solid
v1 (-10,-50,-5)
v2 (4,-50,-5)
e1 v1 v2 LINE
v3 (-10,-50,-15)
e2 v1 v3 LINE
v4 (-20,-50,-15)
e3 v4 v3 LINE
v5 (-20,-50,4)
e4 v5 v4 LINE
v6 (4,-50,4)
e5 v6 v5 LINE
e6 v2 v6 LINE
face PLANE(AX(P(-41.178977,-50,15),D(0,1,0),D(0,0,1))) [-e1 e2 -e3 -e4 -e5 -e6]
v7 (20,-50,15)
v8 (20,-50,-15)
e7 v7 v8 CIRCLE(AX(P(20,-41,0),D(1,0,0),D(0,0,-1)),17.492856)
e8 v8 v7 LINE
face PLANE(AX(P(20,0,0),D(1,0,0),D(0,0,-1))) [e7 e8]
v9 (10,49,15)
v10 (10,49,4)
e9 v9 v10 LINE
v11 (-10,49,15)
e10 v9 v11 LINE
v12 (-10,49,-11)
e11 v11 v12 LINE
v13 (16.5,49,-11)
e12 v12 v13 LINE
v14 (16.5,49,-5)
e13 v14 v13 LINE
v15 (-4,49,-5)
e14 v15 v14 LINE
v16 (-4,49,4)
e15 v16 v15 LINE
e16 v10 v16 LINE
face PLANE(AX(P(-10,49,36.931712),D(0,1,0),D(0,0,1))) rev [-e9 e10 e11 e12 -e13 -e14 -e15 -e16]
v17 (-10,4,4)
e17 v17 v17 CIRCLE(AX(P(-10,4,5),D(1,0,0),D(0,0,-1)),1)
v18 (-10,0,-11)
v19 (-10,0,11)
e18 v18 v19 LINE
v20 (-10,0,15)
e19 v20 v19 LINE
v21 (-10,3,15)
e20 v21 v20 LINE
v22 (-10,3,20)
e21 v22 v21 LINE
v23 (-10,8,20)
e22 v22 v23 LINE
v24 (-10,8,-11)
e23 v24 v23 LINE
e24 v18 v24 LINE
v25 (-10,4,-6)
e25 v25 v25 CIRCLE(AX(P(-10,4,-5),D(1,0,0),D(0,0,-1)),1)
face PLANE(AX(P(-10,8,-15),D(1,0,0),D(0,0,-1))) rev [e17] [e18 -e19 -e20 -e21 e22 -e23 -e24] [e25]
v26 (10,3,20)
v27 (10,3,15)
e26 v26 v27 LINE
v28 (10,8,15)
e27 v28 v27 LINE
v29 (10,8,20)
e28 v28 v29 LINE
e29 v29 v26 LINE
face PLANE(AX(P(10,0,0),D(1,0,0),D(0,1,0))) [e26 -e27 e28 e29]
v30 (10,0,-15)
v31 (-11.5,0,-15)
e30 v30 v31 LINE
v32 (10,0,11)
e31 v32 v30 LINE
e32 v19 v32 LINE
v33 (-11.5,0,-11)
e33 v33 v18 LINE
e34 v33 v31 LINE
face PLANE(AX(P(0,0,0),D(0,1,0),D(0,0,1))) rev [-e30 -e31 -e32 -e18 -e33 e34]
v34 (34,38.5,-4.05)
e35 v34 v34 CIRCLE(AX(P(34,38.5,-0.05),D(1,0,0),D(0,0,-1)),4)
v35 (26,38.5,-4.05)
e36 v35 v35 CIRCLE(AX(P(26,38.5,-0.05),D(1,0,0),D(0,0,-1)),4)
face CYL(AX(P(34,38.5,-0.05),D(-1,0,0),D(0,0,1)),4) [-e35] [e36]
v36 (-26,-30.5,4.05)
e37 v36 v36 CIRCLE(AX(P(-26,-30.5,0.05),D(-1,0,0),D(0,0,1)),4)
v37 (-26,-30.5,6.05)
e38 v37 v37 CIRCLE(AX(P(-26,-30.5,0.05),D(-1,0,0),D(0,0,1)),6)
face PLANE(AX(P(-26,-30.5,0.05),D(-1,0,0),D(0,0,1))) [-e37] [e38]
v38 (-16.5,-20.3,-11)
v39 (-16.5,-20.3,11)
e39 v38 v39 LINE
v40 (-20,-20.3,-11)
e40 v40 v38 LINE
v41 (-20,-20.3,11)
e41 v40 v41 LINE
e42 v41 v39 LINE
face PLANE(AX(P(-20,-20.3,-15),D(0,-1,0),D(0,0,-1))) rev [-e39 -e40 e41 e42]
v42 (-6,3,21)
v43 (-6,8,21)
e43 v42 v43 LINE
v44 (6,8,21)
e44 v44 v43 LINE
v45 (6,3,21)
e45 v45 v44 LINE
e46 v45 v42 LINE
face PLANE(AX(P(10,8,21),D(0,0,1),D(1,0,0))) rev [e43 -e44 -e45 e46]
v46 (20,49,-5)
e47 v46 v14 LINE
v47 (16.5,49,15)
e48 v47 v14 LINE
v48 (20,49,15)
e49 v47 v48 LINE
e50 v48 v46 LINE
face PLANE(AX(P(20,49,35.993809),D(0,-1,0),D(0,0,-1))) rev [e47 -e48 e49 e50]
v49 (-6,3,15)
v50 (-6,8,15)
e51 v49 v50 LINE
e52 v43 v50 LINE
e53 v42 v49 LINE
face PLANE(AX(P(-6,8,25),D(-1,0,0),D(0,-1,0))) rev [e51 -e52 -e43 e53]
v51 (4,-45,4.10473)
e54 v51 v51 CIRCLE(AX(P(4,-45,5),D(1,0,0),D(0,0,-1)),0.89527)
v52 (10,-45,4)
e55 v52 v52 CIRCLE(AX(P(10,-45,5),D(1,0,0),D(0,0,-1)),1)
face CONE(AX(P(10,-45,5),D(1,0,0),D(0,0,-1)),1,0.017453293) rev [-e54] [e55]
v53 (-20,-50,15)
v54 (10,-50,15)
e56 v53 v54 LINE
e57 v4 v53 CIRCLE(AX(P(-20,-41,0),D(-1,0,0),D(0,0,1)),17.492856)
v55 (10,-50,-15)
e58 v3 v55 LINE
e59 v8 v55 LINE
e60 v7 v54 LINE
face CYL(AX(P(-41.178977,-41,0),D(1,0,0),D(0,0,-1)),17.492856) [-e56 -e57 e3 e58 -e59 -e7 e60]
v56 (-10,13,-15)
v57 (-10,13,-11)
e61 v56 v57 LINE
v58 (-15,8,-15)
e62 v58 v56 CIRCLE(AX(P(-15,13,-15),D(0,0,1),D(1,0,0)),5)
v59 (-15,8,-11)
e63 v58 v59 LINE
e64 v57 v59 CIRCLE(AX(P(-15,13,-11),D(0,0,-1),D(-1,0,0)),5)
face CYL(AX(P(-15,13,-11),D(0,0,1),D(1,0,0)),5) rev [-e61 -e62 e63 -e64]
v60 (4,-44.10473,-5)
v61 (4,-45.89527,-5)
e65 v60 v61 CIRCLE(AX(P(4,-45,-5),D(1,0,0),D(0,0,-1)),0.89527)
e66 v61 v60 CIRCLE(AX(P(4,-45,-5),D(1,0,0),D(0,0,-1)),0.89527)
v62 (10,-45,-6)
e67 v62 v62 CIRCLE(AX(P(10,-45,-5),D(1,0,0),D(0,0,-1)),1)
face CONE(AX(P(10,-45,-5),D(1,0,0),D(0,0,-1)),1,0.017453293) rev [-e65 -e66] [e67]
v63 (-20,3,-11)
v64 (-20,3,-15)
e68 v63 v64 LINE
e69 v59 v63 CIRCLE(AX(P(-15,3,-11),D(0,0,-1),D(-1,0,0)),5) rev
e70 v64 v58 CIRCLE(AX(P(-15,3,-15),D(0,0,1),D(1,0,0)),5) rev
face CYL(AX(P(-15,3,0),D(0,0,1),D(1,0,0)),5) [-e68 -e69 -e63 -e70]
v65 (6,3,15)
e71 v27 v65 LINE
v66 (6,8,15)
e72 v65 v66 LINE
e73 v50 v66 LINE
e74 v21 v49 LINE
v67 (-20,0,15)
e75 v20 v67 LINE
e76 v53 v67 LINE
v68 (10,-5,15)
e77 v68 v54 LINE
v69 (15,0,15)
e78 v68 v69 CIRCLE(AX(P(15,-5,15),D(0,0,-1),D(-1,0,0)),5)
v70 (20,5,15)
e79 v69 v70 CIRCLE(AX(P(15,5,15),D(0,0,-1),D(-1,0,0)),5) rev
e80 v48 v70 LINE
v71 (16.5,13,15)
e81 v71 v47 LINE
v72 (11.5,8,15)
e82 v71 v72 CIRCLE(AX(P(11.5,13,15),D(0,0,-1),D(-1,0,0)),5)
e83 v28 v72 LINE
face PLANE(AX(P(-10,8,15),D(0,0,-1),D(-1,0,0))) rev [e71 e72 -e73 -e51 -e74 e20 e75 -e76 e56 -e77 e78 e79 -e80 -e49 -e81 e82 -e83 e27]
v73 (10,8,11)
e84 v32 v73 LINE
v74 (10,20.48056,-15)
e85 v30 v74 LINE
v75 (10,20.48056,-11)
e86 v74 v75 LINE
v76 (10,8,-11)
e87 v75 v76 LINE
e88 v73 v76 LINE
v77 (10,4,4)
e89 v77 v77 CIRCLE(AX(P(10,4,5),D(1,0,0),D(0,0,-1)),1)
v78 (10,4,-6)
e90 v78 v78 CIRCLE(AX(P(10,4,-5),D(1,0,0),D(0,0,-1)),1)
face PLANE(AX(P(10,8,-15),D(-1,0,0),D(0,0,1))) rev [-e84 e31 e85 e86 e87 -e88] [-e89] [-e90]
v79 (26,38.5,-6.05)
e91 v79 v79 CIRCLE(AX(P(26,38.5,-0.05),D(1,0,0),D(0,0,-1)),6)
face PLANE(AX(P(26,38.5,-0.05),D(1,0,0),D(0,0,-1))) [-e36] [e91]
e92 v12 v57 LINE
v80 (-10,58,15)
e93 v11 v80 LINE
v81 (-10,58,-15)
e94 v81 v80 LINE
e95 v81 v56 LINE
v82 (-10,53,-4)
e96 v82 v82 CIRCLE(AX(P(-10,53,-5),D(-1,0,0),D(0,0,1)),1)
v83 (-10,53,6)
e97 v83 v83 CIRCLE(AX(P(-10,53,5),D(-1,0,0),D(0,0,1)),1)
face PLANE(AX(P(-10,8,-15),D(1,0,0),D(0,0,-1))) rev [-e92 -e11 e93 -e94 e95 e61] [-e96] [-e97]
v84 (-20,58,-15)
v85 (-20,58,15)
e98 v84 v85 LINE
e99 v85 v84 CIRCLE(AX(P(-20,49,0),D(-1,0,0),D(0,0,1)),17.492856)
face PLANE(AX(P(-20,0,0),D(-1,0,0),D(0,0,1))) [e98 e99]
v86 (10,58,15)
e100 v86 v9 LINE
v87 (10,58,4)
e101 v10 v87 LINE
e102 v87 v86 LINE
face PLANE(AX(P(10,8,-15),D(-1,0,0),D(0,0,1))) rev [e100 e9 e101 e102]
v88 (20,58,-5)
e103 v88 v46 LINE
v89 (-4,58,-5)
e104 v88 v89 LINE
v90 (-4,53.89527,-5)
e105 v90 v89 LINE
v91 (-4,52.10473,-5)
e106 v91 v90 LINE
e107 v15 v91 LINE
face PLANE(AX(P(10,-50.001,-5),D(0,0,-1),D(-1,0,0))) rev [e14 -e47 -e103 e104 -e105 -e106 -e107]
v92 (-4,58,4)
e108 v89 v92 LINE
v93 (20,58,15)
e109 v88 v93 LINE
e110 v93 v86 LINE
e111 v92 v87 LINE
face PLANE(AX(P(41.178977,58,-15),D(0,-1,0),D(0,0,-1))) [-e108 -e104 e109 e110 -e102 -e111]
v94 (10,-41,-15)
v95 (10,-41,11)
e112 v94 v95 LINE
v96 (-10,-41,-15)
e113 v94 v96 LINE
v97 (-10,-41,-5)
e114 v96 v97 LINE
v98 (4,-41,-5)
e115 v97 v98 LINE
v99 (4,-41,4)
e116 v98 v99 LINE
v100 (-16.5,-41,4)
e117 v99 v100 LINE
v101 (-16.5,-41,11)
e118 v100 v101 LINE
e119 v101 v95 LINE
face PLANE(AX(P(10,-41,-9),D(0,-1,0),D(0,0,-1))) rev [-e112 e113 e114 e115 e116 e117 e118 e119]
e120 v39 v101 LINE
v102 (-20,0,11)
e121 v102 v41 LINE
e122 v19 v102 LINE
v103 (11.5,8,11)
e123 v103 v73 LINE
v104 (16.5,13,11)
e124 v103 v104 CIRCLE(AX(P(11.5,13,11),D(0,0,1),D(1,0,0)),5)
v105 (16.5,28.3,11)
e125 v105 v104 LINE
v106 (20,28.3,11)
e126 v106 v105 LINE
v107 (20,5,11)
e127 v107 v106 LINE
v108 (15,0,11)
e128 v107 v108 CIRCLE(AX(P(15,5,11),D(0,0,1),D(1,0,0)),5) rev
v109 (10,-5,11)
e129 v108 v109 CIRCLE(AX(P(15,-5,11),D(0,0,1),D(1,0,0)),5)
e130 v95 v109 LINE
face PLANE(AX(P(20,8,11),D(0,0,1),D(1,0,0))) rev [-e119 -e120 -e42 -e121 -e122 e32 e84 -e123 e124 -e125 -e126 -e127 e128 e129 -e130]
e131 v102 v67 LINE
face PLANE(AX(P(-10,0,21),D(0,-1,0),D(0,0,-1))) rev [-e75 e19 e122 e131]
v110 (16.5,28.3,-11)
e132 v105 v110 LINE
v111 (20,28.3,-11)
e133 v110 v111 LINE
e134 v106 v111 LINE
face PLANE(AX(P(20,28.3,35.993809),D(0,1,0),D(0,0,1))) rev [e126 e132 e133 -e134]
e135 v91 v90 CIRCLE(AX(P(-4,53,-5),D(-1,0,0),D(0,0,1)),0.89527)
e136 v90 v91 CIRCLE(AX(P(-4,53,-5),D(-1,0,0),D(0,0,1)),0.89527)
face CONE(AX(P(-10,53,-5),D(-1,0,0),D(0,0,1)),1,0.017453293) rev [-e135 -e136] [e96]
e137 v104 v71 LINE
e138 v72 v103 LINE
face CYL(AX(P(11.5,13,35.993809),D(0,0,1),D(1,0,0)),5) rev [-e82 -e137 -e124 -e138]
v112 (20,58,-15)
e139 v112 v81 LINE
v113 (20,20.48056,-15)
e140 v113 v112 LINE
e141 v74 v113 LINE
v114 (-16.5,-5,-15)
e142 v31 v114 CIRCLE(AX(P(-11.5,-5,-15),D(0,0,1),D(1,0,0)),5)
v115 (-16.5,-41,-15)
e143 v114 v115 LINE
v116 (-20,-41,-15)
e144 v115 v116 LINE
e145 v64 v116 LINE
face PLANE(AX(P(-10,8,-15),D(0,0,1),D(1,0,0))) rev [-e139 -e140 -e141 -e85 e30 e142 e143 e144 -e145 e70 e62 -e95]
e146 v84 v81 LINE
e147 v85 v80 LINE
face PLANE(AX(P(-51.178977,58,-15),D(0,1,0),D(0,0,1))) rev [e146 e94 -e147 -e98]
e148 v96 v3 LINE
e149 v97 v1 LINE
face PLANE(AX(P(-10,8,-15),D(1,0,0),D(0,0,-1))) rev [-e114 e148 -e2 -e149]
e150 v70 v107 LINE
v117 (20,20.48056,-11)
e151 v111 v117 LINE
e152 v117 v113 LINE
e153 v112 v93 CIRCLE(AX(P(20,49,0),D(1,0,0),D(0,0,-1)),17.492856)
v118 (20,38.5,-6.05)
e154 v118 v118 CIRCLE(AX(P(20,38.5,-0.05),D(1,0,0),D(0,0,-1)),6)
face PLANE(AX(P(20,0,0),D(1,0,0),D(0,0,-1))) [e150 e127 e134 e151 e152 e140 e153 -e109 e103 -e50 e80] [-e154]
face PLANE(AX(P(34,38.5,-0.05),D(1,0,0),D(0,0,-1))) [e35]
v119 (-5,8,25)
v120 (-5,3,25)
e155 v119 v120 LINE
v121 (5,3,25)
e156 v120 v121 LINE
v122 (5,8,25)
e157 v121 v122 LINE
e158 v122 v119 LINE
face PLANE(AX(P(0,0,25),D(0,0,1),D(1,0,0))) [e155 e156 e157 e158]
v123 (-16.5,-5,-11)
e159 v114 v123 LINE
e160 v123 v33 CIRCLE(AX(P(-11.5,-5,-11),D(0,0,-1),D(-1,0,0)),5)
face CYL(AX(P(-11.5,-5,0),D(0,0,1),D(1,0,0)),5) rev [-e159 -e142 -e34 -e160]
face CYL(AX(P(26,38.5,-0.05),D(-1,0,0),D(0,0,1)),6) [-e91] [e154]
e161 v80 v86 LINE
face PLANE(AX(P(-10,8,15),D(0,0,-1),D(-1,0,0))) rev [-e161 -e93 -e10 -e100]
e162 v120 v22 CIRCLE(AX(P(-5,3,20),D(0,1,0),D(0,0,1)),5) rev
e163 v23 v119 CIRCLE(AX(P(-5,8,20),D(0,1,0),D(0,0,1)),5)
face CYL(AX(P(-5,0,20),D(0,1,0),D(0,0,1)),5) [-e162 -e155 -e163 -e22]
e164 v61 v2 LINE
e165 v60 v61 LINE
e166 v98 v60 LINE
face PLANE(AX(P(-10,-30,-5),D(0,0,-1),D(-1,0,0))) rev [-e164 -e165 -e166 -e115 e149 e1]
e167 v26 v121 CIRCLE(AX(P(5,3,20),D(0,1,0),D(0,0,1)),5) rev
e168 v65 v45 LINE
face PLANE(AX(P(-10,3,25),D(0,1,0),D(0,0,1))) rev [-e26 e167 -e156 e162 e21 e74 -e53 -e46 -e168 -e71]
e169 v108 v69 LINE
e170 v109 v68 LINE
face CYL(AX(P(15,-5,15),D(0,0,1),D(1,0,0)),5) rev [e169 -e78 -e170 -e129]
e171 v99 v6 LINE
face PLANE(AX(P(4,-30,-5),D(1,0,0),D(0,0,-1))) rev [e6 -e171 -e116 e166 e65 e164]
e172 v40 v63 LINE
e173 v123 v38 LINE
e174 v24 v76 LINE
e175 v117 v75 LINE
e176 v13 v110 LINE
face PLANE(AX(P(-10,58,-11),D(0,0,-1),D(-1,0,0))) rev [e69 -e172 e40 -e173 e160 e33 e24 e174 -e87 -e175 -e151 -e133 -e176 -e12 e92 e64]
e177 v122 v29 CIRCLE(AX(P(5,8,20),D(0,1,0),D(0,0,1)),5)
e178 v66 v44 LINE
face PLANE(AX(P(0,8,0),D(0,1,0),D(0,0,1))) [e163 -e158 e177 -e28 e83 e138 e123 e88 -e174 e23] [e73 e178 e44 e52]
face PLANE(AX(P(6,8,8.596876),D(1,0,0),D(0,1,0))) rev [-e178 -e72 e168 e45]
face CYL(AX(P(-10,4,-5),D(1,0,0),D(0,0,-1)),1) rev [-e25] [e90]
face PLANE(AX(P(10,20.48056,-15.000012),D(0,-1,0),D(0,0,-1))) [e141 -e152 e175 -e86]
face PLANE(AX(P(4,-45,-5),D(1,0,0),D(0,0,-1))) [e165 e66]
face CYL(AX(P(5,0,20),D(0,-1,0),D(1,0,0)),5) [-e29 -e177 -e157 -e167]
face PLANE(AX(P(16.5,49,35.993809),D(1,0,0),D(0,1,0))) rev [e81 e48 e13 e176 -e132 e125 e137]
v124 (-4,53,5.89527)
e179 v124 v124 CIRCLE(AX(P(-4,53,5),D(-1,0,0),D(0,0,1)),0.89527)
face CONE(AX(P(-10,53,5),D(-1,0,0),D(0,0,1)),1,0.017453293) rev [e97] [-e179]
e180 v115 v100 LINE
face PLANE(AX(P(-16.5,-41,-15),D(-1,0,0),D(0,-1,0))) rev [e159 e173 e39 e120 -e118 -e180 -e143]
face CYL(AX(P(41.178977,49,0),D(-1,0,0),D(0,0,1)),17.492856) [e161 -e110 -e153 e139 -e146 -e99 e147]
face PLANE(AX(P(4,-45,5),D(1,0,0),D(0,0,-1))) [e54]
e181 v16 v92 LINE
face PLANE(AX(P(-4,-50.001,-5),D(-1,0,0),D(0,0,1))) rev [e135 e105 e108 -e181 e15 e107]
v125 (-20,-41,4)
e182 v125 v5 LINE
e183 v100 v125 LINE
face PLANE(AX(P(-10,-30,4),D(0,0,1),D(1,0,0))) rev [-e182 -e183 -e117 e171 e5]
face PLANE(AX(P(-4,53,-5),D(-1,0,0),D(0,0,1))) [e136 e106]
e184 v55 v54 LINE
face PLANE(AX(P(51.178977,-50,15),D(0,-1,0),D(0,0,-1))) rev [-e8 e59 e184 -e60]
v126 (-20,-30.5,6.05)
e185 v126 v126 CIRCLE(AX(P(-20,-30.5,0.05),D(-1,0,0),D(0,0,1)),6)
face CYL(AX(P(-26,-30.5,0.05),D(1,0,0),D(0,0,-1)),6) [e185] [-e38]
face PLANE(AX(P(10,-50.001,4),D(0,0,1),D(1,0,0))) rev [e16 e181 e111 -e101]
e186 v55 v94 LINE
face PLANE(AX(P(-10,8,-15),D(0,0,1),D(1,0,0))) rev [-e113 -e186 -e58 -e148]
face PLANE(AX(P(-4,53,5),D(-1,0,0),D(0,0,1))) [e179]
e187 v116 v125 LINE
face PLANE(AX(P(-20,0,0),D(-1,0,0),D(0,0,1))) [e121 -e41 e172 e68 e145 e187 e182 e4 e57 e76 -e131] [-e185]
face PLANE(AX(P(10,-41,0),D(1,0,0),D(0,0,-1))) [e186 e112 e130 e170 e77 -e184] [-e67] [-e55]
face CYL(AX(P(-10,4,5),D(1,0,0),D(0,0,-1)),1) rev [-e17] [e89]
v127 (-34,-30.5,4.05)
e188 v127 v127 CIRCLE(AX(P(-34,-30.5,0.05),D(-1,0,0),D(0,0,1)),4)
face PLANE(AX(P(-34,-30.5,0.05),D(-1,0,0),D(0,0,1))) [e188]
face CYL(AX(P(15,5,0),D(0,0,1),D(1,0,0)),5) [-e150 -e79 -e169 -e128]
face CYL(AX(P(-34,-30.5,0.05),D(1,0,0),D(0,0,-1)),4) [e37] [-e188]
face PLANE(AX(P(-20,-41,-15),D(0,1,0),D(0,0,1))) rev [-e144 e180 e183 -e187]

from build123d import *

# Parameters (mm, degrees)
SKETCH1_W                    = 20
SKETCH1_H                    = 30
BOSS_EXTRUDE1_DEPTH          = 8
SKETCH2_R                    = 1
CUT_EXTRUDE1_DEPTH           = 27.248809497
SKETCH3_W                    = 20
SKETCH3_H                    = 4
BOSS_EXTRUDE2_DEPTH          = 50
SKETCH4_W                    = 20
SKETCH4_H                    = 9
BOSS_EXTRUDE3_DEPTH          = 20
SKETCH5_W                    = 5
SKETCH5_H                    = 9
CUT_EXTRUDE2_DEPTH           = 20
SKETCH6_W                    = 9
SKETCH6_H                    = 9
CUT_EXTRUDE3_DEPTH           = 20
SKETCH7_W                    = 20
SKETCH7_H                    = 9
BOSS_EXTRUDE4_DEPTH          = 6
SKETCH8_W                    = 20
SKETCH8_H                    = 4
BOSS_EXTRUDE5_DEPTH          = 50
SKETCH9_W                    = 20
SKETCH9_H                    = 9
BOSS_EXTRUDE6_DEPTH          = 26
CUT_EXTRUDE4_REACH           = 111.494
SKETCH10_W                   = 14
SKETCH10_H                   = 9
SKETCH11_W                   = 4
SKETCH11_H                   = 8
BOSS_EXTRUDE7_DEPTH          = 10
SKETCH12_W                   = 3.5
SKETCH12_H                   = 20.7
BOSS_EXTRUDE8_DEPTH          = 26
BOSS_EXTRUDE9_REACH          = 84.194
SKETCH13_W                   = 3.5
SKETCH13_H                   = 4
SKETCH14_W                   = 1.495344936
SKETCH14_H                   = 11
BOSS_EXTRUDE10_DEPTH         = 9
SKETCH15_W                   = 11
SKETCH15_H                   = 0.013273072
BOSS_EXTRUDE11_DEPTH         = 9.075671666
SKETCH16_R                   = 4
BOSS_EXTRUDE12_DEPTH         = 14
SKETCH17_W                   = 4
SKETCH17_H                   = 8
BOSS_EXTRUDE13_DEPTH         = 10
BOSS_EXTRUDE14_REACH         = 74.083
SKETCH18_W                   = 3.5
SKETCH18_H                   = 20.7
BOSS_EXTRUDE15_REACH         = 70.884
SKETCH19_W                   = 3.5
SKETCH19_H                   = 4
SKETCH20_R                   = 4
BOSS_EXTRUDE16_DEPTH         = 14
SKETCH21_R                   = 1
CUT_EXTRUDE5_DEPTH           = 6
CUT_EXTRUDE5_DRAFT           = -1
CUT_EXTRUDE5_PROFILE_2_DEPTH = 6
CUT_EXTRUDE5_PROFILE_2_DRAFT = -1
SKETCH22_R                   = 1
CUT_EXTRUDE6_DEPTH           = 6
CUT_EXTRUDE6_DRAFT           = -1
CUT_EXTRUDE6_PROFILE_2_DEPTH = 6
CUT_EXTRUDE6_PROFILE_2_DRAFT = -1
FILLET2_START                = -15
FILLET2_DEPTH                = 31
FILLET2_2_DEPTH              = 4
FILLET2_START_2              = 11
FILLET2_3_DEPTH              = 4
BOSS_EXTRUDE18_DEPTH         = 20
BOSS_EXTRUDE19_DEPTH         = 20
SKETCH26_W                   = 10.666488476
SKETCH26_H                   = 15.41081711
CUT_EXTRUDE7_DEPTH           = 10
CUT_EXTRUDE8_DEPTH           = 81.481674045
CUT_EXTRUDE8_DEPTH_BACK      = 4
SKETCH28_W                   = 13.079869273
SKETCH28_H                   = 27.565671677
BOSS_EXTRUDE20_DEPTH         = 10
BOSS_EXTRUDE21_DEPTH         = 10
SKETCH31_R                   = 6
BOSS_EXTRUDE22_DEPTH         = 6
SKETCH32_R                   = 6
BOSS_EXTRUDE23_DEPTH         = 6
BOSS_EXTRUDE24_START         = 10
BOSS_EXTRUDE24_DEPTH         = 10
BOSS_EXTRUDE25_START         = 10
BOSS_EXTRUDE25_DEPTH         = 10
SKETCH35_W                   = 4
SKETCH35_H                   = 5
BOSS_EXTRUDE26_DEPTH         = 10
SKETCH36_W                   = 4
SKETCH36_H                   = 5
BOSS_EXTRUDE27_DEPTH         = 16
SKETCH37_W                   = 4
SKETCH37_H                   = 5
BOSS_EXTRUDE28_DEPTH         = 6
FILLET4_R                    = 5


with BuildPart() as part:
    # Sketch1 → Boss-Extrude1 (new body)
    with BuildSketch(Plane(origin=(0, 0, 0), x_dir=(1, 0, 0), z_dir=(0, 1, 0))):
        Rectangle(SKETCH1_W, SKETCH1_H)
    extrude(amount=BOSS_EXTRUDE1_DEPTH)

    # Sketch2 → Cut-Extrude1 (cut, through all)
    with BuildSketch(Plane(origin=(10, 0, 0), x_dir=(0, 0, -1), z_dir=(1, 0, 0))):
        with Locations((-5, 4)):
            Circle(SKETCH2_R)
        with Locations((5, 4)):
            Circle(SKETCH2_R)
    extrude(amount=-CUT_EXTRUDE1_DEPTH, mode=Mode.SUBTRACT)

    # Sketch3 → Boss-Extrude2 (add)
    with BuildSketch(Plane.XZ):
        with Locations((0, 13)):
            Rectangle(SKETCH3_W, SKETCH3_H)
    extrude(amount=BOSS_EXTRUDE2_DEPTH)

    # Sketch4 → Boss-Extrude3 (add)
    with BuildSketch(Plane(origin=(0, 0, 11), x_dir=(-1, 0, 0), z_dir=(0, 0, -1))):
        with Locations((0, -45.5)):
            Rectangle(SKETCH4_W, SKETCH4_H)
    extrude(amount=BOSS_EXTRUDE3_DEPTH)

    # Sketch5 → Cut-Extrude2 (cut)
    with BuildSketch(Plane.XZ.offset(50)):
        with Locations((-7.5, -0.5)):
            Rectangle(SKETCH5_W, SKETCH5_H)
    extrude(amount=-CUT_EXTRUDE2_DEPTH, mode=Mode.SUBTRACT)

    # Sketch6 → Cut-Extrude3 (cut)
    with BuildSketch(Plane.XZ.offset(50)):
        with Locations((-0.5, -0.5)):
            Rectangle(SKETCH6_W, SKETCH6_H)
    extrude(amount=-CUT_EXTRUDE3_DEPTH, mode=Mode.SUBTRACT)

    # Sketch7 → Boss-Extrude4 (add)
    with BuildSketch(Plane(origin=(0, 0, -9), x_dir=(-1, 0, 0), z_dir=(0, 0, -1))):
        with Locations((0, -45.5)):
            Rectangle(SKETCH7_W, SKETCH7_H)
    extrude(amount=BOSS_EXTRUDE4_DEPTH)

    # Sketch8 → Boss-Extrude5 (add)
    with BuildSketch(Plane(origin=(0, 8, 0), x_dir=(1, 0, 0), z_dir=(0, 1, 0))):
        with Locations((0, 13)):
            Rectangle(SKETCH8_W, SKETCH8_H)
    extrude(amount=BOSS_EXTRUDE5_DEPTH)

    # Sketch9 → Boss-Extrude6 (add)
    with BuildSketch(Plane.XY.offset(-11)):
        with Locations((0, 53.5)):
            Rectangle(SKETCH9_W, SKETCH9_H)
    extrude(amount=BOSS_EXTRUDE6_DEPTH)

    # Sketch10 → Cut-Extrude4 (cut, up to next)
    with BuildSketch(Plane(origin=(0, 58, 0), x_dir=(1, 0, 0), z_dir=(0, 1, 0)), mode=Mode.PRIVATE) as cut_extrude4_sk1:
        with Locations((3, 0.5)):
            Rectangle(SKETCH10_W, SKETCH10_H)
    cut_extrude4_tool1 = extrude(cut_extrude4_sk1.sketch, amount=-CUT_EXTRUDE4_REACH, mode=Mode.PRIVATE) & part.part
    add(cut_extrude4_tool1.solids().sort_by_distance((3, 58, -0.5))[0], mode=Mode.SUBTRACT)

    # Sketch11 → Boss-Extrude7 (add)
    with BuildSketch(Plane.ZY.offset(10)):
        Polygon((4, -41), (11, -41), (11, 8), (15, 8), (15, -41), (15, -49.986726928), (4, -49.986726928), align=None)
        with Locations((-13, 4)):
            Rectangle(SKETCH11_W, SKETCH11_H)
    extrude(amount=BOSS_EXTRUDE7_DEPTH)

    # Sketch12 → Boss-Extrude8 (add)
    with BuildSketch(Plane(origin=(0, 0, 11), x_dir=(-1, 0, 0), z_dir=(0, 0, -1))):
        with Locations((18.25, -30.65)):
            Rectangle(SKETCH12_W, SKETCH12_H)
    extrude(amount=BOSS_EXTRUDE8_DEPTH)

    # Sketch13 → Boss-Extrude9 (add, up to next)
    with BuildSketch(Plane(origin=(0, -20.3, 0), x_dir=(1, 0, 0), z_dir=(0, 1, 0)), mode=Mode.PRIVATE) as boss_extrude9_sk1:
        with Locations((-18.25, 13)):
            Rectangle(SKETCH13_W, SKETCH13_H)
    boss_extrude9_tool1 = extrude(boss_extrude9_sk1.sketch, amount=BOSS_EXTRUDE9_REACH, mode=Mode.PRIVATE) - part.part
    add(boss_extrude9_tool1.solids().sort_by_distance((-18.25, -20.3, -13))[0])

    # Sketch14 → Boss-Extrude10 (add)
    with BuildSketch(Plane.XZ.offset(50)):
        with Locations((-10.176655866, 9.5)):
            Rectangle(SKETCH14_W, SKETCH14_H)
    extrude(amount=-BOSS_EXTRUDE10_DEPTH)

    # Sketch15 → Boss-Extrude11 (add)
    with BuildSketch(Plane.ZY.offset(10.924328334)):
        with Locations((9.5, -49.993363464)):
            Rectangle(SKETCH15_W, SKETCH15_H)
    extrude(amount=BOSS_EXTRUDE11_DEPTH)

    # Sketch16 → Boss-Extrude12 (add)
    with BuildSketch(Plane.ZY.offset(20)):
        with Locations((0.05, -30.5)):
            Circle(SKETCH16_R)
    extrude(amount=BOSS_EXTRUDE12_DEPTH)

    # Sketch17 → Boss-Extrude13 (add)
    with BuildSketch(Plane(origin=(10, 0, 0), x_dir=(0, 0, -1), z_dir=(1, 0, 0))):
        Polygon((5, 58), (15, 58), (15, 49), (15, 0), (11, 0), (11, 49), (5, 49), align=None)
        with Locations((-13, 4)):
            Rectangle(SKETCH17_W, SKETCH17_H)
    extrude(amount=BOSS_EXTRUDE13_DEPTH)

    # Boss-Extrude14: up to this face of the body (flat: up to its plane)
    boss_extrude14_end = Plane(part.part.faces().sort_by_distance((0, 53.5, 15))[0])
    # Sketch18 → Boss-Extrude14 (add, up to the picked face)
    with BuildSketch(Plane.XY.offset(-11), mode=Mode.PRIVATE) as boss_extrude14_sk1:
        with Locations((18.25, 38.65)):
            Rectangle(SKETCH18_W, SKETCH18_H)
    boss_extrude14_tool1 = split(extrude(boss_extrude14_sk1.sketch, amount=BOSS_EXTRUDE14_REACH, mode=Mode.PRIVATE), bisect_by=boss_extrude14_end, keep=Keep.BOTH, mode=Mode.PRIVATE)
    add(boss_extrude14_tool1.solids().sort_by(Axis((18.25, 38.65, -11), (0, 0, 1)))[0])

    # Sketch19 → Boss-Extrude15 (add, up to next)
    with BuildSketch(Plane(origin=(0, 8, 0), x_dir=(1, 0, 0), z_dir=(0, 1, 0)), mode=Mode.PRIVATE) as boss_extrude15_sk1:
        with Locations((18.25, -13)):
            Rectangle(SKETCH19_W, SKETCH19_H)
    boss_extrude15_tool1 = extrude(boss_extrude15_sk1.sketch, amount=BOSS_EXTRUDE15_REACH, mode=Mode.PRIVATE) - part.part
    add(boss_extrude15_tool1.solids().sort_by_distance((18.25, 8, 13))[0])

    # Sketch20 → Boss-Extrude16 (add)
    with BuildSketch(Plane(origin=(20, 0, 0), x_dir=(0, 0, -1), z_dir=(1, 0, 0))):
        with Locations((0.05, 38.5)):
            Circle(SKETCH20_R)
    extrude(amount=BOSS_EXTRUDE16_DEPTH)


with BuildPart() as cut_extrude5_tool:
    # Sketch21 → Cut-Extrude5 (with draft: the straight prism first)
    with BuildSketch(Plane(origin=(10, 0, 0), x_dir=(0, 0, -1), z_dir=(1, 0, 0))):
        with Locations((-5, -45)):
            Circle(SKETCH21_R)
    extrude(amount=-CUT_EXTRUDE5_DEPTH)
    # Cut-Extrude5: the draft: its side faces are tilted about the plane it starts from
    cut_extrude5_sides = [cut_extrude5_tool.faces().sort_by_distance(p)[0] for p in [
        (7, -45, 6),
    ]]
    draft(cut_extrude5_sides, Plane(origin=(10, 0, 0), x_dir=(0, 0, -1), z_dir=(1, 0, 0)), CUT_EXTRUDE5_DRAFT)


with BuildPart() as part_1:
    add(part.part)

    # Cut-Extrude5: cut by cut_extrude5_tool
    add(cut_extrude5_tool.part, mode=Mode.SUBTRACT)


with BuildPart() as cut_extrude5_profile_2_tool:
    # Sketch21 → Cut-Extrude5 profile 2 (with draft: the straight prism first)
    with BuildSketch(Plane(origin=(10, 0, 0), x_dir=(0, 0, -1), z_dir=(1, 0, 0))):
        with Locations((5, -45)):
            Circle(SKETCH21_R)
    extrude(amount=-CUT_EXTRUDE5_PROFILE_2_DEPTH)
    # Cut-Extrude5 profile 2: the draft: its side faces are tilted about the plane it starts from
    cut_extrude5_profile_2_sides = [cut_extrude5_profile_2_tool.faces().sort_by_distance(p)[0] for p in [
        (7, -45, -4),
    ]]
    draft(cut_extrude5_profile_2_sides, Plane(origin=(10, 0, 0), x_dir=(0, 0, -1), z_dir=(1, 0, 0)), CUT_EXTRUDE5_PROFILE_2_DRAFT)


with BuildPart() as part_2:
    add(part_1.part)

    # Cut-Extrude5 profile 2: cut by cut_extrude5_profile_2_tool
    add(cut_extrude5_profile_2_tool.part, mode=Mode.SUBTRACT)


with BuildPart() as cut_extrude6_tool:
    # Sketch22 → Cut-Extrude6 (with draft: the straight prism first)
    with BuildSketch(Plane.ZY.offset(10)):
        with Locations((-5, 53)):
            Circle(SKETCH22_R)
    extrude(amount=-CUT_EXTRUDE6_DEPTH)
    # Cut-Extrude6: the draft: its side faces are tilted about the plane it starts from
    cut_extrude6_sides = [cut_extrude6_tool.faces().sort_by_distance(p)[0] for p in [
        (-7, 53, -6),
    ]]
    draft(cut_extrude6_sides, Plane.ZY.offset(10), CUT_EXTRUDE6_DRAFT)


with BuildPart() as part_3:
    add(part_2.part)

    # Cut-Extrude6: cut by cut_extrude6_tool
    add(cut_extrude6_tool.part, mode=Mode.SUBTRACT)


with BuildPart() as cut_extrude6_profile_2_tool:
    # Sketch22 → Cut-Extrude6 profile 2 (with draft: the straight prism first)
    with BuildSketch(Plane.ZY.offset(10)):
        with Locations((5, 53)):
            Circle(SKETCH22_R)
    extrude(amount=-CUT_EXTRUDE6_PROFILE_2_DEPTH)
    # Cut-Extrude6 profile 2: the draft: its side faces are tilted about the plane it starts from
    cut_extrude6_profile_2_sides = [cut_extrude6_profile_2_tool.faces().sort_by_distance(p)[0] for p in [
        (-7, 53, 4),
    ]]
    draft(cut_extrude6_profile_2_sides, Plane.ZY.offset(10), CUT_EXTRUDE6_PROFILE_2_DRAFT)


with BuildPart() as part_4:
    add(part_3.part)

    # Cut-Extrude6 profile 2: cut by cut_extrude6_profile_2_tool
    add(cut_extrude6_profile_2_tool.part, mode=Mode.SUBTRACT)

    # Fillet2: read off the stored shape, not the designer's step
    # Fillet2 outline → Fillet2 (cut)
    with BuildSketch(Plane.XY.offset(FILLET2_START)):
        with BuildLine():
            ThreePointArc((-20, 3), (-18.535533906, 6.535533906), (-15, 8))
            Line((-15, 8), (-20, 8))
            Line((-20, 8), (-20, 3))
        make_face()
        with BuildLine():
            ThreePointArc((20, 5), (18.535533906, 1.464466094), (15, 0))
            Line((15, 0), (20, 0))
            Line((20, 0), (20, 5))
        make_face()
    extrude(amount=FILLET2_DEPTH, mode=Mode.SUBTRACT)

    # Fillet2 2 outline → Fillet2 2 (add)
    with BuildSketch(Plane.XY.offset(FILLET2_START)):
        with BuildLine():
            Line((-15, 8), (-10, 8))
            Line((-10, 8), (-10, 13))
            ThreePointArc((-10, 13), (-11.464466094, 9.464466094), (-15, 8))
        make_face()
        with BuildLine():
            ThreePointArc((-16.5, -5), (-15.035533906, -1.464466094), (-11.5, 0))
            Line((-11.5, 0), (-16.5, 0))
            Line((-16.5, 0), (-16.5, -5))
        make_face()
    extrude(amount=FILLET2_2_DEPTH)

    # Fillet2 3 outline → Fillet2 3 (add)
    with BuildSketch(Plane.XY.offset(FILLET2_START_2)):
        with BuildLine():
            ThreePointArc((16.5, 13), (15.035533906, 9.464466094), (11.5, 8))
            Line((11.5, 8), (16.5, 8))
            Line((16.5, 8), (16.5, 13))
        make_face()
        with BuildLine():
            Line((15, 0), (10, 0))
            Line((10, 0), (10, -5))
            ThreePointArc((10, -5), (11.464466094, -1.464466094), (15, 0))
        make_face()
    extrude(amount=FILLET2_3_DEPTH)

    # Sketch25 → Boss-Extrude19 (add)
    with BuildSketch(Plane.ZY.offset(10)):
        with BuildLine():
            Line((-15, 58), (15, 58))
            ThreePointArc((15, 58), (0, 66.492855685), (-15, 58))
        make_face()
    extrude(amount=-BOSS_EXTRUDE19_DEPTH)

    # Sketch26 → Cut-Extrude7 (cut)
    with BuildSketch(Plane(origin=(0, 0, 11), x_dir=(-1, 0, 0), z_dir=(0, 0, -1))):
        with Locations((15.333244238, 7.705408555)):
            Rectangle(SKETCH26_W, SKETCH26_H)
    extrude(amount=-CUT_EXTRUDE7_DEPTH, mode=Mode.SUBTRACT)

    # Sketch28 → Cut-Extrude8 (cut, two sides: drawn at the far end of the back side and taken through both)
    with BuildSketch(Plane(origin=(0, 0, -15), x_dir=(-1, 0, 0), z_dir=(0, 0, -1)).offset(-CUT_EXTRUDE8_DEPTH_BACK)):
        with Locations((-16.539934636, 6.697724659)):
            Rectangle(SKETCH28_W, SKETCH28_H)
    extrude(amount=CUT_EXTRUDE8_DEPTH + CUT_EXTRUDE8_DEPTH_BACK, mode=Mode.SUBTRACT)

    # Sketch29 → Boss-Extrude20 (add)
    with BuildSketch(Plane(origin=(10, 0, 0), x_dir=(0, 0, -1), z_dir=(1, 0, 0))):
        with BuildLine():
            Line((-4, 58), (-3.362558036, 58))
            Line((-3.362558036, 58), (5, 58))
            Line((5, 58), (15, 58))
            ThreePointArc((15, 58), (0, 66.492855685), (-15, 58))
            Line((-15, 58), (-4, 58))
        make_face()
    extrude(amount=BOSS_EXTRUDE20_DEPTH)



with BuildPart() as body_2:
    # Sketch24 → Boss-Extrude18 (new body)
    with BuildSketch(Plane(origin=(10, 0, 0), x_dir=(0, 0, -1), z_dir=(1, 0, 0))):
        with BuildLine():
            Line((-15, -50), (15, -50))
            ThreePointArc((15, -50), (0, -58.492855685), (-15, -50))
        make_face()
    extrude(amount=-BOSS_EXTRUDE18_DEPTH)


with BuildPart() as part_5:
    add(part_4.part)

    add(body_2.part)  # Boss-Extrude21 merges body 2
    # Sketch30 → Boss-Extrude21 (add)
    with BuildSketch(Plane.ZY.offset(10)):
        with BuildLine():
            Line((-15, -50), (15, -50))
            ThreePointArc((15, -50), (0, -58.492855685), (-15, -50))
        make_face()
    extrude(amount=BOSS_EXTRUDE21_DEPTH)

    # Sketch31 → Boss-Extrude22 (add)
    with BuildSketch(Plane.ZY.offset(20)):
        with Locations((0.05, -30.5)):
            Circle(SKETCH31_R)
    extrude(amount=BOSS_EXTRUDE22_DEPTH)

    # Sketch32 → Boss-Extrude23 (add)
    with BuildSketch(Plane(origin=(20, 0, 0), x_dir=(0, 0, -1), z_dir=(1, 0, 0))):
        with Locations((0.05, 38.5)):
            Circle(SKETCH32_R)
    extrude(amount=BOSS_EXTRUDE23_DEPTH)

    # Sketch33 → Boss-Extrude24 (add)
    with BuildSketch(Plane(origin=(10, 0, 0), x_dir=(0, 0, -1), z_dir=(1, 0, 0)).offset(BOSS_EXTRUDE24_START)):
        with BuildLine():
            Line((-15, -50), (15, -50))
            ThreePointArc((15, -50), (0, -58.492855685), (-15, -50))
        make_face()
    extrude(amount=-BOSS_EXTRUDE24_DEPTH)

    # Sketch34 → Boss-Extrude25 (add)
    with BuildSketch(Plane.ZY.offset(10).offset(BOSS_EXTRUDE25_START)):
        with BuildLine():
            Line((-15, 58), (15, 58))
            ThreePointArc((15, 58), (0, 66.492855685), (-15, 58))
        make_face()
    extrude(amount=-BOSS_EXTRUDE25_DEPTH)

    # Sketch35 → Boss-Extrude26 (add)
    with BuildSketch(Plane.XY.offset(15)):
        with Locations((-8, 5.5)):
            Rectangle(SKETCH35_W, SKETCH35_H)
    extrude(amount=BOSS_EXTRUDE26_DEPTH)

    # Sketch36 → Boss-Extrude27 (add)
    with BuildSketch(Plane(origin=(-6, 0, 0), x_dir=(0, 0, -1), z_dir=(1, 0, 0))):
        with Locations((-23, 5.5)):
            Rectangle(SKETCH36_W, SKETCH36_H)
    extrude(amount=BOSS_EXTRUDE27_DEPTH)

    # Sketch37 → Boss-Extrude28 (add)
    with BuildSketch(Plane(origin=(0, 0, 21), x_dir=(-1, 0, 0), z_dir=(0, 0, -1))):
        with Locations((-8, 5.5)):
            Rectangle(SKETCH37_W, SKETCH37_H)
    extrude(amount=BOSS_EXTRUDE28_DEPTH)

    # Fillet4
    fillet4_edges = [part_5.edges().sort_by_distance(p)[0] for p in [
        (-10, 5.5, 25),
        (10, 5.5, 25),
    ]]
    fillet(fillet4_edges, radius=FILLET4_R)


solid = part_5.part
